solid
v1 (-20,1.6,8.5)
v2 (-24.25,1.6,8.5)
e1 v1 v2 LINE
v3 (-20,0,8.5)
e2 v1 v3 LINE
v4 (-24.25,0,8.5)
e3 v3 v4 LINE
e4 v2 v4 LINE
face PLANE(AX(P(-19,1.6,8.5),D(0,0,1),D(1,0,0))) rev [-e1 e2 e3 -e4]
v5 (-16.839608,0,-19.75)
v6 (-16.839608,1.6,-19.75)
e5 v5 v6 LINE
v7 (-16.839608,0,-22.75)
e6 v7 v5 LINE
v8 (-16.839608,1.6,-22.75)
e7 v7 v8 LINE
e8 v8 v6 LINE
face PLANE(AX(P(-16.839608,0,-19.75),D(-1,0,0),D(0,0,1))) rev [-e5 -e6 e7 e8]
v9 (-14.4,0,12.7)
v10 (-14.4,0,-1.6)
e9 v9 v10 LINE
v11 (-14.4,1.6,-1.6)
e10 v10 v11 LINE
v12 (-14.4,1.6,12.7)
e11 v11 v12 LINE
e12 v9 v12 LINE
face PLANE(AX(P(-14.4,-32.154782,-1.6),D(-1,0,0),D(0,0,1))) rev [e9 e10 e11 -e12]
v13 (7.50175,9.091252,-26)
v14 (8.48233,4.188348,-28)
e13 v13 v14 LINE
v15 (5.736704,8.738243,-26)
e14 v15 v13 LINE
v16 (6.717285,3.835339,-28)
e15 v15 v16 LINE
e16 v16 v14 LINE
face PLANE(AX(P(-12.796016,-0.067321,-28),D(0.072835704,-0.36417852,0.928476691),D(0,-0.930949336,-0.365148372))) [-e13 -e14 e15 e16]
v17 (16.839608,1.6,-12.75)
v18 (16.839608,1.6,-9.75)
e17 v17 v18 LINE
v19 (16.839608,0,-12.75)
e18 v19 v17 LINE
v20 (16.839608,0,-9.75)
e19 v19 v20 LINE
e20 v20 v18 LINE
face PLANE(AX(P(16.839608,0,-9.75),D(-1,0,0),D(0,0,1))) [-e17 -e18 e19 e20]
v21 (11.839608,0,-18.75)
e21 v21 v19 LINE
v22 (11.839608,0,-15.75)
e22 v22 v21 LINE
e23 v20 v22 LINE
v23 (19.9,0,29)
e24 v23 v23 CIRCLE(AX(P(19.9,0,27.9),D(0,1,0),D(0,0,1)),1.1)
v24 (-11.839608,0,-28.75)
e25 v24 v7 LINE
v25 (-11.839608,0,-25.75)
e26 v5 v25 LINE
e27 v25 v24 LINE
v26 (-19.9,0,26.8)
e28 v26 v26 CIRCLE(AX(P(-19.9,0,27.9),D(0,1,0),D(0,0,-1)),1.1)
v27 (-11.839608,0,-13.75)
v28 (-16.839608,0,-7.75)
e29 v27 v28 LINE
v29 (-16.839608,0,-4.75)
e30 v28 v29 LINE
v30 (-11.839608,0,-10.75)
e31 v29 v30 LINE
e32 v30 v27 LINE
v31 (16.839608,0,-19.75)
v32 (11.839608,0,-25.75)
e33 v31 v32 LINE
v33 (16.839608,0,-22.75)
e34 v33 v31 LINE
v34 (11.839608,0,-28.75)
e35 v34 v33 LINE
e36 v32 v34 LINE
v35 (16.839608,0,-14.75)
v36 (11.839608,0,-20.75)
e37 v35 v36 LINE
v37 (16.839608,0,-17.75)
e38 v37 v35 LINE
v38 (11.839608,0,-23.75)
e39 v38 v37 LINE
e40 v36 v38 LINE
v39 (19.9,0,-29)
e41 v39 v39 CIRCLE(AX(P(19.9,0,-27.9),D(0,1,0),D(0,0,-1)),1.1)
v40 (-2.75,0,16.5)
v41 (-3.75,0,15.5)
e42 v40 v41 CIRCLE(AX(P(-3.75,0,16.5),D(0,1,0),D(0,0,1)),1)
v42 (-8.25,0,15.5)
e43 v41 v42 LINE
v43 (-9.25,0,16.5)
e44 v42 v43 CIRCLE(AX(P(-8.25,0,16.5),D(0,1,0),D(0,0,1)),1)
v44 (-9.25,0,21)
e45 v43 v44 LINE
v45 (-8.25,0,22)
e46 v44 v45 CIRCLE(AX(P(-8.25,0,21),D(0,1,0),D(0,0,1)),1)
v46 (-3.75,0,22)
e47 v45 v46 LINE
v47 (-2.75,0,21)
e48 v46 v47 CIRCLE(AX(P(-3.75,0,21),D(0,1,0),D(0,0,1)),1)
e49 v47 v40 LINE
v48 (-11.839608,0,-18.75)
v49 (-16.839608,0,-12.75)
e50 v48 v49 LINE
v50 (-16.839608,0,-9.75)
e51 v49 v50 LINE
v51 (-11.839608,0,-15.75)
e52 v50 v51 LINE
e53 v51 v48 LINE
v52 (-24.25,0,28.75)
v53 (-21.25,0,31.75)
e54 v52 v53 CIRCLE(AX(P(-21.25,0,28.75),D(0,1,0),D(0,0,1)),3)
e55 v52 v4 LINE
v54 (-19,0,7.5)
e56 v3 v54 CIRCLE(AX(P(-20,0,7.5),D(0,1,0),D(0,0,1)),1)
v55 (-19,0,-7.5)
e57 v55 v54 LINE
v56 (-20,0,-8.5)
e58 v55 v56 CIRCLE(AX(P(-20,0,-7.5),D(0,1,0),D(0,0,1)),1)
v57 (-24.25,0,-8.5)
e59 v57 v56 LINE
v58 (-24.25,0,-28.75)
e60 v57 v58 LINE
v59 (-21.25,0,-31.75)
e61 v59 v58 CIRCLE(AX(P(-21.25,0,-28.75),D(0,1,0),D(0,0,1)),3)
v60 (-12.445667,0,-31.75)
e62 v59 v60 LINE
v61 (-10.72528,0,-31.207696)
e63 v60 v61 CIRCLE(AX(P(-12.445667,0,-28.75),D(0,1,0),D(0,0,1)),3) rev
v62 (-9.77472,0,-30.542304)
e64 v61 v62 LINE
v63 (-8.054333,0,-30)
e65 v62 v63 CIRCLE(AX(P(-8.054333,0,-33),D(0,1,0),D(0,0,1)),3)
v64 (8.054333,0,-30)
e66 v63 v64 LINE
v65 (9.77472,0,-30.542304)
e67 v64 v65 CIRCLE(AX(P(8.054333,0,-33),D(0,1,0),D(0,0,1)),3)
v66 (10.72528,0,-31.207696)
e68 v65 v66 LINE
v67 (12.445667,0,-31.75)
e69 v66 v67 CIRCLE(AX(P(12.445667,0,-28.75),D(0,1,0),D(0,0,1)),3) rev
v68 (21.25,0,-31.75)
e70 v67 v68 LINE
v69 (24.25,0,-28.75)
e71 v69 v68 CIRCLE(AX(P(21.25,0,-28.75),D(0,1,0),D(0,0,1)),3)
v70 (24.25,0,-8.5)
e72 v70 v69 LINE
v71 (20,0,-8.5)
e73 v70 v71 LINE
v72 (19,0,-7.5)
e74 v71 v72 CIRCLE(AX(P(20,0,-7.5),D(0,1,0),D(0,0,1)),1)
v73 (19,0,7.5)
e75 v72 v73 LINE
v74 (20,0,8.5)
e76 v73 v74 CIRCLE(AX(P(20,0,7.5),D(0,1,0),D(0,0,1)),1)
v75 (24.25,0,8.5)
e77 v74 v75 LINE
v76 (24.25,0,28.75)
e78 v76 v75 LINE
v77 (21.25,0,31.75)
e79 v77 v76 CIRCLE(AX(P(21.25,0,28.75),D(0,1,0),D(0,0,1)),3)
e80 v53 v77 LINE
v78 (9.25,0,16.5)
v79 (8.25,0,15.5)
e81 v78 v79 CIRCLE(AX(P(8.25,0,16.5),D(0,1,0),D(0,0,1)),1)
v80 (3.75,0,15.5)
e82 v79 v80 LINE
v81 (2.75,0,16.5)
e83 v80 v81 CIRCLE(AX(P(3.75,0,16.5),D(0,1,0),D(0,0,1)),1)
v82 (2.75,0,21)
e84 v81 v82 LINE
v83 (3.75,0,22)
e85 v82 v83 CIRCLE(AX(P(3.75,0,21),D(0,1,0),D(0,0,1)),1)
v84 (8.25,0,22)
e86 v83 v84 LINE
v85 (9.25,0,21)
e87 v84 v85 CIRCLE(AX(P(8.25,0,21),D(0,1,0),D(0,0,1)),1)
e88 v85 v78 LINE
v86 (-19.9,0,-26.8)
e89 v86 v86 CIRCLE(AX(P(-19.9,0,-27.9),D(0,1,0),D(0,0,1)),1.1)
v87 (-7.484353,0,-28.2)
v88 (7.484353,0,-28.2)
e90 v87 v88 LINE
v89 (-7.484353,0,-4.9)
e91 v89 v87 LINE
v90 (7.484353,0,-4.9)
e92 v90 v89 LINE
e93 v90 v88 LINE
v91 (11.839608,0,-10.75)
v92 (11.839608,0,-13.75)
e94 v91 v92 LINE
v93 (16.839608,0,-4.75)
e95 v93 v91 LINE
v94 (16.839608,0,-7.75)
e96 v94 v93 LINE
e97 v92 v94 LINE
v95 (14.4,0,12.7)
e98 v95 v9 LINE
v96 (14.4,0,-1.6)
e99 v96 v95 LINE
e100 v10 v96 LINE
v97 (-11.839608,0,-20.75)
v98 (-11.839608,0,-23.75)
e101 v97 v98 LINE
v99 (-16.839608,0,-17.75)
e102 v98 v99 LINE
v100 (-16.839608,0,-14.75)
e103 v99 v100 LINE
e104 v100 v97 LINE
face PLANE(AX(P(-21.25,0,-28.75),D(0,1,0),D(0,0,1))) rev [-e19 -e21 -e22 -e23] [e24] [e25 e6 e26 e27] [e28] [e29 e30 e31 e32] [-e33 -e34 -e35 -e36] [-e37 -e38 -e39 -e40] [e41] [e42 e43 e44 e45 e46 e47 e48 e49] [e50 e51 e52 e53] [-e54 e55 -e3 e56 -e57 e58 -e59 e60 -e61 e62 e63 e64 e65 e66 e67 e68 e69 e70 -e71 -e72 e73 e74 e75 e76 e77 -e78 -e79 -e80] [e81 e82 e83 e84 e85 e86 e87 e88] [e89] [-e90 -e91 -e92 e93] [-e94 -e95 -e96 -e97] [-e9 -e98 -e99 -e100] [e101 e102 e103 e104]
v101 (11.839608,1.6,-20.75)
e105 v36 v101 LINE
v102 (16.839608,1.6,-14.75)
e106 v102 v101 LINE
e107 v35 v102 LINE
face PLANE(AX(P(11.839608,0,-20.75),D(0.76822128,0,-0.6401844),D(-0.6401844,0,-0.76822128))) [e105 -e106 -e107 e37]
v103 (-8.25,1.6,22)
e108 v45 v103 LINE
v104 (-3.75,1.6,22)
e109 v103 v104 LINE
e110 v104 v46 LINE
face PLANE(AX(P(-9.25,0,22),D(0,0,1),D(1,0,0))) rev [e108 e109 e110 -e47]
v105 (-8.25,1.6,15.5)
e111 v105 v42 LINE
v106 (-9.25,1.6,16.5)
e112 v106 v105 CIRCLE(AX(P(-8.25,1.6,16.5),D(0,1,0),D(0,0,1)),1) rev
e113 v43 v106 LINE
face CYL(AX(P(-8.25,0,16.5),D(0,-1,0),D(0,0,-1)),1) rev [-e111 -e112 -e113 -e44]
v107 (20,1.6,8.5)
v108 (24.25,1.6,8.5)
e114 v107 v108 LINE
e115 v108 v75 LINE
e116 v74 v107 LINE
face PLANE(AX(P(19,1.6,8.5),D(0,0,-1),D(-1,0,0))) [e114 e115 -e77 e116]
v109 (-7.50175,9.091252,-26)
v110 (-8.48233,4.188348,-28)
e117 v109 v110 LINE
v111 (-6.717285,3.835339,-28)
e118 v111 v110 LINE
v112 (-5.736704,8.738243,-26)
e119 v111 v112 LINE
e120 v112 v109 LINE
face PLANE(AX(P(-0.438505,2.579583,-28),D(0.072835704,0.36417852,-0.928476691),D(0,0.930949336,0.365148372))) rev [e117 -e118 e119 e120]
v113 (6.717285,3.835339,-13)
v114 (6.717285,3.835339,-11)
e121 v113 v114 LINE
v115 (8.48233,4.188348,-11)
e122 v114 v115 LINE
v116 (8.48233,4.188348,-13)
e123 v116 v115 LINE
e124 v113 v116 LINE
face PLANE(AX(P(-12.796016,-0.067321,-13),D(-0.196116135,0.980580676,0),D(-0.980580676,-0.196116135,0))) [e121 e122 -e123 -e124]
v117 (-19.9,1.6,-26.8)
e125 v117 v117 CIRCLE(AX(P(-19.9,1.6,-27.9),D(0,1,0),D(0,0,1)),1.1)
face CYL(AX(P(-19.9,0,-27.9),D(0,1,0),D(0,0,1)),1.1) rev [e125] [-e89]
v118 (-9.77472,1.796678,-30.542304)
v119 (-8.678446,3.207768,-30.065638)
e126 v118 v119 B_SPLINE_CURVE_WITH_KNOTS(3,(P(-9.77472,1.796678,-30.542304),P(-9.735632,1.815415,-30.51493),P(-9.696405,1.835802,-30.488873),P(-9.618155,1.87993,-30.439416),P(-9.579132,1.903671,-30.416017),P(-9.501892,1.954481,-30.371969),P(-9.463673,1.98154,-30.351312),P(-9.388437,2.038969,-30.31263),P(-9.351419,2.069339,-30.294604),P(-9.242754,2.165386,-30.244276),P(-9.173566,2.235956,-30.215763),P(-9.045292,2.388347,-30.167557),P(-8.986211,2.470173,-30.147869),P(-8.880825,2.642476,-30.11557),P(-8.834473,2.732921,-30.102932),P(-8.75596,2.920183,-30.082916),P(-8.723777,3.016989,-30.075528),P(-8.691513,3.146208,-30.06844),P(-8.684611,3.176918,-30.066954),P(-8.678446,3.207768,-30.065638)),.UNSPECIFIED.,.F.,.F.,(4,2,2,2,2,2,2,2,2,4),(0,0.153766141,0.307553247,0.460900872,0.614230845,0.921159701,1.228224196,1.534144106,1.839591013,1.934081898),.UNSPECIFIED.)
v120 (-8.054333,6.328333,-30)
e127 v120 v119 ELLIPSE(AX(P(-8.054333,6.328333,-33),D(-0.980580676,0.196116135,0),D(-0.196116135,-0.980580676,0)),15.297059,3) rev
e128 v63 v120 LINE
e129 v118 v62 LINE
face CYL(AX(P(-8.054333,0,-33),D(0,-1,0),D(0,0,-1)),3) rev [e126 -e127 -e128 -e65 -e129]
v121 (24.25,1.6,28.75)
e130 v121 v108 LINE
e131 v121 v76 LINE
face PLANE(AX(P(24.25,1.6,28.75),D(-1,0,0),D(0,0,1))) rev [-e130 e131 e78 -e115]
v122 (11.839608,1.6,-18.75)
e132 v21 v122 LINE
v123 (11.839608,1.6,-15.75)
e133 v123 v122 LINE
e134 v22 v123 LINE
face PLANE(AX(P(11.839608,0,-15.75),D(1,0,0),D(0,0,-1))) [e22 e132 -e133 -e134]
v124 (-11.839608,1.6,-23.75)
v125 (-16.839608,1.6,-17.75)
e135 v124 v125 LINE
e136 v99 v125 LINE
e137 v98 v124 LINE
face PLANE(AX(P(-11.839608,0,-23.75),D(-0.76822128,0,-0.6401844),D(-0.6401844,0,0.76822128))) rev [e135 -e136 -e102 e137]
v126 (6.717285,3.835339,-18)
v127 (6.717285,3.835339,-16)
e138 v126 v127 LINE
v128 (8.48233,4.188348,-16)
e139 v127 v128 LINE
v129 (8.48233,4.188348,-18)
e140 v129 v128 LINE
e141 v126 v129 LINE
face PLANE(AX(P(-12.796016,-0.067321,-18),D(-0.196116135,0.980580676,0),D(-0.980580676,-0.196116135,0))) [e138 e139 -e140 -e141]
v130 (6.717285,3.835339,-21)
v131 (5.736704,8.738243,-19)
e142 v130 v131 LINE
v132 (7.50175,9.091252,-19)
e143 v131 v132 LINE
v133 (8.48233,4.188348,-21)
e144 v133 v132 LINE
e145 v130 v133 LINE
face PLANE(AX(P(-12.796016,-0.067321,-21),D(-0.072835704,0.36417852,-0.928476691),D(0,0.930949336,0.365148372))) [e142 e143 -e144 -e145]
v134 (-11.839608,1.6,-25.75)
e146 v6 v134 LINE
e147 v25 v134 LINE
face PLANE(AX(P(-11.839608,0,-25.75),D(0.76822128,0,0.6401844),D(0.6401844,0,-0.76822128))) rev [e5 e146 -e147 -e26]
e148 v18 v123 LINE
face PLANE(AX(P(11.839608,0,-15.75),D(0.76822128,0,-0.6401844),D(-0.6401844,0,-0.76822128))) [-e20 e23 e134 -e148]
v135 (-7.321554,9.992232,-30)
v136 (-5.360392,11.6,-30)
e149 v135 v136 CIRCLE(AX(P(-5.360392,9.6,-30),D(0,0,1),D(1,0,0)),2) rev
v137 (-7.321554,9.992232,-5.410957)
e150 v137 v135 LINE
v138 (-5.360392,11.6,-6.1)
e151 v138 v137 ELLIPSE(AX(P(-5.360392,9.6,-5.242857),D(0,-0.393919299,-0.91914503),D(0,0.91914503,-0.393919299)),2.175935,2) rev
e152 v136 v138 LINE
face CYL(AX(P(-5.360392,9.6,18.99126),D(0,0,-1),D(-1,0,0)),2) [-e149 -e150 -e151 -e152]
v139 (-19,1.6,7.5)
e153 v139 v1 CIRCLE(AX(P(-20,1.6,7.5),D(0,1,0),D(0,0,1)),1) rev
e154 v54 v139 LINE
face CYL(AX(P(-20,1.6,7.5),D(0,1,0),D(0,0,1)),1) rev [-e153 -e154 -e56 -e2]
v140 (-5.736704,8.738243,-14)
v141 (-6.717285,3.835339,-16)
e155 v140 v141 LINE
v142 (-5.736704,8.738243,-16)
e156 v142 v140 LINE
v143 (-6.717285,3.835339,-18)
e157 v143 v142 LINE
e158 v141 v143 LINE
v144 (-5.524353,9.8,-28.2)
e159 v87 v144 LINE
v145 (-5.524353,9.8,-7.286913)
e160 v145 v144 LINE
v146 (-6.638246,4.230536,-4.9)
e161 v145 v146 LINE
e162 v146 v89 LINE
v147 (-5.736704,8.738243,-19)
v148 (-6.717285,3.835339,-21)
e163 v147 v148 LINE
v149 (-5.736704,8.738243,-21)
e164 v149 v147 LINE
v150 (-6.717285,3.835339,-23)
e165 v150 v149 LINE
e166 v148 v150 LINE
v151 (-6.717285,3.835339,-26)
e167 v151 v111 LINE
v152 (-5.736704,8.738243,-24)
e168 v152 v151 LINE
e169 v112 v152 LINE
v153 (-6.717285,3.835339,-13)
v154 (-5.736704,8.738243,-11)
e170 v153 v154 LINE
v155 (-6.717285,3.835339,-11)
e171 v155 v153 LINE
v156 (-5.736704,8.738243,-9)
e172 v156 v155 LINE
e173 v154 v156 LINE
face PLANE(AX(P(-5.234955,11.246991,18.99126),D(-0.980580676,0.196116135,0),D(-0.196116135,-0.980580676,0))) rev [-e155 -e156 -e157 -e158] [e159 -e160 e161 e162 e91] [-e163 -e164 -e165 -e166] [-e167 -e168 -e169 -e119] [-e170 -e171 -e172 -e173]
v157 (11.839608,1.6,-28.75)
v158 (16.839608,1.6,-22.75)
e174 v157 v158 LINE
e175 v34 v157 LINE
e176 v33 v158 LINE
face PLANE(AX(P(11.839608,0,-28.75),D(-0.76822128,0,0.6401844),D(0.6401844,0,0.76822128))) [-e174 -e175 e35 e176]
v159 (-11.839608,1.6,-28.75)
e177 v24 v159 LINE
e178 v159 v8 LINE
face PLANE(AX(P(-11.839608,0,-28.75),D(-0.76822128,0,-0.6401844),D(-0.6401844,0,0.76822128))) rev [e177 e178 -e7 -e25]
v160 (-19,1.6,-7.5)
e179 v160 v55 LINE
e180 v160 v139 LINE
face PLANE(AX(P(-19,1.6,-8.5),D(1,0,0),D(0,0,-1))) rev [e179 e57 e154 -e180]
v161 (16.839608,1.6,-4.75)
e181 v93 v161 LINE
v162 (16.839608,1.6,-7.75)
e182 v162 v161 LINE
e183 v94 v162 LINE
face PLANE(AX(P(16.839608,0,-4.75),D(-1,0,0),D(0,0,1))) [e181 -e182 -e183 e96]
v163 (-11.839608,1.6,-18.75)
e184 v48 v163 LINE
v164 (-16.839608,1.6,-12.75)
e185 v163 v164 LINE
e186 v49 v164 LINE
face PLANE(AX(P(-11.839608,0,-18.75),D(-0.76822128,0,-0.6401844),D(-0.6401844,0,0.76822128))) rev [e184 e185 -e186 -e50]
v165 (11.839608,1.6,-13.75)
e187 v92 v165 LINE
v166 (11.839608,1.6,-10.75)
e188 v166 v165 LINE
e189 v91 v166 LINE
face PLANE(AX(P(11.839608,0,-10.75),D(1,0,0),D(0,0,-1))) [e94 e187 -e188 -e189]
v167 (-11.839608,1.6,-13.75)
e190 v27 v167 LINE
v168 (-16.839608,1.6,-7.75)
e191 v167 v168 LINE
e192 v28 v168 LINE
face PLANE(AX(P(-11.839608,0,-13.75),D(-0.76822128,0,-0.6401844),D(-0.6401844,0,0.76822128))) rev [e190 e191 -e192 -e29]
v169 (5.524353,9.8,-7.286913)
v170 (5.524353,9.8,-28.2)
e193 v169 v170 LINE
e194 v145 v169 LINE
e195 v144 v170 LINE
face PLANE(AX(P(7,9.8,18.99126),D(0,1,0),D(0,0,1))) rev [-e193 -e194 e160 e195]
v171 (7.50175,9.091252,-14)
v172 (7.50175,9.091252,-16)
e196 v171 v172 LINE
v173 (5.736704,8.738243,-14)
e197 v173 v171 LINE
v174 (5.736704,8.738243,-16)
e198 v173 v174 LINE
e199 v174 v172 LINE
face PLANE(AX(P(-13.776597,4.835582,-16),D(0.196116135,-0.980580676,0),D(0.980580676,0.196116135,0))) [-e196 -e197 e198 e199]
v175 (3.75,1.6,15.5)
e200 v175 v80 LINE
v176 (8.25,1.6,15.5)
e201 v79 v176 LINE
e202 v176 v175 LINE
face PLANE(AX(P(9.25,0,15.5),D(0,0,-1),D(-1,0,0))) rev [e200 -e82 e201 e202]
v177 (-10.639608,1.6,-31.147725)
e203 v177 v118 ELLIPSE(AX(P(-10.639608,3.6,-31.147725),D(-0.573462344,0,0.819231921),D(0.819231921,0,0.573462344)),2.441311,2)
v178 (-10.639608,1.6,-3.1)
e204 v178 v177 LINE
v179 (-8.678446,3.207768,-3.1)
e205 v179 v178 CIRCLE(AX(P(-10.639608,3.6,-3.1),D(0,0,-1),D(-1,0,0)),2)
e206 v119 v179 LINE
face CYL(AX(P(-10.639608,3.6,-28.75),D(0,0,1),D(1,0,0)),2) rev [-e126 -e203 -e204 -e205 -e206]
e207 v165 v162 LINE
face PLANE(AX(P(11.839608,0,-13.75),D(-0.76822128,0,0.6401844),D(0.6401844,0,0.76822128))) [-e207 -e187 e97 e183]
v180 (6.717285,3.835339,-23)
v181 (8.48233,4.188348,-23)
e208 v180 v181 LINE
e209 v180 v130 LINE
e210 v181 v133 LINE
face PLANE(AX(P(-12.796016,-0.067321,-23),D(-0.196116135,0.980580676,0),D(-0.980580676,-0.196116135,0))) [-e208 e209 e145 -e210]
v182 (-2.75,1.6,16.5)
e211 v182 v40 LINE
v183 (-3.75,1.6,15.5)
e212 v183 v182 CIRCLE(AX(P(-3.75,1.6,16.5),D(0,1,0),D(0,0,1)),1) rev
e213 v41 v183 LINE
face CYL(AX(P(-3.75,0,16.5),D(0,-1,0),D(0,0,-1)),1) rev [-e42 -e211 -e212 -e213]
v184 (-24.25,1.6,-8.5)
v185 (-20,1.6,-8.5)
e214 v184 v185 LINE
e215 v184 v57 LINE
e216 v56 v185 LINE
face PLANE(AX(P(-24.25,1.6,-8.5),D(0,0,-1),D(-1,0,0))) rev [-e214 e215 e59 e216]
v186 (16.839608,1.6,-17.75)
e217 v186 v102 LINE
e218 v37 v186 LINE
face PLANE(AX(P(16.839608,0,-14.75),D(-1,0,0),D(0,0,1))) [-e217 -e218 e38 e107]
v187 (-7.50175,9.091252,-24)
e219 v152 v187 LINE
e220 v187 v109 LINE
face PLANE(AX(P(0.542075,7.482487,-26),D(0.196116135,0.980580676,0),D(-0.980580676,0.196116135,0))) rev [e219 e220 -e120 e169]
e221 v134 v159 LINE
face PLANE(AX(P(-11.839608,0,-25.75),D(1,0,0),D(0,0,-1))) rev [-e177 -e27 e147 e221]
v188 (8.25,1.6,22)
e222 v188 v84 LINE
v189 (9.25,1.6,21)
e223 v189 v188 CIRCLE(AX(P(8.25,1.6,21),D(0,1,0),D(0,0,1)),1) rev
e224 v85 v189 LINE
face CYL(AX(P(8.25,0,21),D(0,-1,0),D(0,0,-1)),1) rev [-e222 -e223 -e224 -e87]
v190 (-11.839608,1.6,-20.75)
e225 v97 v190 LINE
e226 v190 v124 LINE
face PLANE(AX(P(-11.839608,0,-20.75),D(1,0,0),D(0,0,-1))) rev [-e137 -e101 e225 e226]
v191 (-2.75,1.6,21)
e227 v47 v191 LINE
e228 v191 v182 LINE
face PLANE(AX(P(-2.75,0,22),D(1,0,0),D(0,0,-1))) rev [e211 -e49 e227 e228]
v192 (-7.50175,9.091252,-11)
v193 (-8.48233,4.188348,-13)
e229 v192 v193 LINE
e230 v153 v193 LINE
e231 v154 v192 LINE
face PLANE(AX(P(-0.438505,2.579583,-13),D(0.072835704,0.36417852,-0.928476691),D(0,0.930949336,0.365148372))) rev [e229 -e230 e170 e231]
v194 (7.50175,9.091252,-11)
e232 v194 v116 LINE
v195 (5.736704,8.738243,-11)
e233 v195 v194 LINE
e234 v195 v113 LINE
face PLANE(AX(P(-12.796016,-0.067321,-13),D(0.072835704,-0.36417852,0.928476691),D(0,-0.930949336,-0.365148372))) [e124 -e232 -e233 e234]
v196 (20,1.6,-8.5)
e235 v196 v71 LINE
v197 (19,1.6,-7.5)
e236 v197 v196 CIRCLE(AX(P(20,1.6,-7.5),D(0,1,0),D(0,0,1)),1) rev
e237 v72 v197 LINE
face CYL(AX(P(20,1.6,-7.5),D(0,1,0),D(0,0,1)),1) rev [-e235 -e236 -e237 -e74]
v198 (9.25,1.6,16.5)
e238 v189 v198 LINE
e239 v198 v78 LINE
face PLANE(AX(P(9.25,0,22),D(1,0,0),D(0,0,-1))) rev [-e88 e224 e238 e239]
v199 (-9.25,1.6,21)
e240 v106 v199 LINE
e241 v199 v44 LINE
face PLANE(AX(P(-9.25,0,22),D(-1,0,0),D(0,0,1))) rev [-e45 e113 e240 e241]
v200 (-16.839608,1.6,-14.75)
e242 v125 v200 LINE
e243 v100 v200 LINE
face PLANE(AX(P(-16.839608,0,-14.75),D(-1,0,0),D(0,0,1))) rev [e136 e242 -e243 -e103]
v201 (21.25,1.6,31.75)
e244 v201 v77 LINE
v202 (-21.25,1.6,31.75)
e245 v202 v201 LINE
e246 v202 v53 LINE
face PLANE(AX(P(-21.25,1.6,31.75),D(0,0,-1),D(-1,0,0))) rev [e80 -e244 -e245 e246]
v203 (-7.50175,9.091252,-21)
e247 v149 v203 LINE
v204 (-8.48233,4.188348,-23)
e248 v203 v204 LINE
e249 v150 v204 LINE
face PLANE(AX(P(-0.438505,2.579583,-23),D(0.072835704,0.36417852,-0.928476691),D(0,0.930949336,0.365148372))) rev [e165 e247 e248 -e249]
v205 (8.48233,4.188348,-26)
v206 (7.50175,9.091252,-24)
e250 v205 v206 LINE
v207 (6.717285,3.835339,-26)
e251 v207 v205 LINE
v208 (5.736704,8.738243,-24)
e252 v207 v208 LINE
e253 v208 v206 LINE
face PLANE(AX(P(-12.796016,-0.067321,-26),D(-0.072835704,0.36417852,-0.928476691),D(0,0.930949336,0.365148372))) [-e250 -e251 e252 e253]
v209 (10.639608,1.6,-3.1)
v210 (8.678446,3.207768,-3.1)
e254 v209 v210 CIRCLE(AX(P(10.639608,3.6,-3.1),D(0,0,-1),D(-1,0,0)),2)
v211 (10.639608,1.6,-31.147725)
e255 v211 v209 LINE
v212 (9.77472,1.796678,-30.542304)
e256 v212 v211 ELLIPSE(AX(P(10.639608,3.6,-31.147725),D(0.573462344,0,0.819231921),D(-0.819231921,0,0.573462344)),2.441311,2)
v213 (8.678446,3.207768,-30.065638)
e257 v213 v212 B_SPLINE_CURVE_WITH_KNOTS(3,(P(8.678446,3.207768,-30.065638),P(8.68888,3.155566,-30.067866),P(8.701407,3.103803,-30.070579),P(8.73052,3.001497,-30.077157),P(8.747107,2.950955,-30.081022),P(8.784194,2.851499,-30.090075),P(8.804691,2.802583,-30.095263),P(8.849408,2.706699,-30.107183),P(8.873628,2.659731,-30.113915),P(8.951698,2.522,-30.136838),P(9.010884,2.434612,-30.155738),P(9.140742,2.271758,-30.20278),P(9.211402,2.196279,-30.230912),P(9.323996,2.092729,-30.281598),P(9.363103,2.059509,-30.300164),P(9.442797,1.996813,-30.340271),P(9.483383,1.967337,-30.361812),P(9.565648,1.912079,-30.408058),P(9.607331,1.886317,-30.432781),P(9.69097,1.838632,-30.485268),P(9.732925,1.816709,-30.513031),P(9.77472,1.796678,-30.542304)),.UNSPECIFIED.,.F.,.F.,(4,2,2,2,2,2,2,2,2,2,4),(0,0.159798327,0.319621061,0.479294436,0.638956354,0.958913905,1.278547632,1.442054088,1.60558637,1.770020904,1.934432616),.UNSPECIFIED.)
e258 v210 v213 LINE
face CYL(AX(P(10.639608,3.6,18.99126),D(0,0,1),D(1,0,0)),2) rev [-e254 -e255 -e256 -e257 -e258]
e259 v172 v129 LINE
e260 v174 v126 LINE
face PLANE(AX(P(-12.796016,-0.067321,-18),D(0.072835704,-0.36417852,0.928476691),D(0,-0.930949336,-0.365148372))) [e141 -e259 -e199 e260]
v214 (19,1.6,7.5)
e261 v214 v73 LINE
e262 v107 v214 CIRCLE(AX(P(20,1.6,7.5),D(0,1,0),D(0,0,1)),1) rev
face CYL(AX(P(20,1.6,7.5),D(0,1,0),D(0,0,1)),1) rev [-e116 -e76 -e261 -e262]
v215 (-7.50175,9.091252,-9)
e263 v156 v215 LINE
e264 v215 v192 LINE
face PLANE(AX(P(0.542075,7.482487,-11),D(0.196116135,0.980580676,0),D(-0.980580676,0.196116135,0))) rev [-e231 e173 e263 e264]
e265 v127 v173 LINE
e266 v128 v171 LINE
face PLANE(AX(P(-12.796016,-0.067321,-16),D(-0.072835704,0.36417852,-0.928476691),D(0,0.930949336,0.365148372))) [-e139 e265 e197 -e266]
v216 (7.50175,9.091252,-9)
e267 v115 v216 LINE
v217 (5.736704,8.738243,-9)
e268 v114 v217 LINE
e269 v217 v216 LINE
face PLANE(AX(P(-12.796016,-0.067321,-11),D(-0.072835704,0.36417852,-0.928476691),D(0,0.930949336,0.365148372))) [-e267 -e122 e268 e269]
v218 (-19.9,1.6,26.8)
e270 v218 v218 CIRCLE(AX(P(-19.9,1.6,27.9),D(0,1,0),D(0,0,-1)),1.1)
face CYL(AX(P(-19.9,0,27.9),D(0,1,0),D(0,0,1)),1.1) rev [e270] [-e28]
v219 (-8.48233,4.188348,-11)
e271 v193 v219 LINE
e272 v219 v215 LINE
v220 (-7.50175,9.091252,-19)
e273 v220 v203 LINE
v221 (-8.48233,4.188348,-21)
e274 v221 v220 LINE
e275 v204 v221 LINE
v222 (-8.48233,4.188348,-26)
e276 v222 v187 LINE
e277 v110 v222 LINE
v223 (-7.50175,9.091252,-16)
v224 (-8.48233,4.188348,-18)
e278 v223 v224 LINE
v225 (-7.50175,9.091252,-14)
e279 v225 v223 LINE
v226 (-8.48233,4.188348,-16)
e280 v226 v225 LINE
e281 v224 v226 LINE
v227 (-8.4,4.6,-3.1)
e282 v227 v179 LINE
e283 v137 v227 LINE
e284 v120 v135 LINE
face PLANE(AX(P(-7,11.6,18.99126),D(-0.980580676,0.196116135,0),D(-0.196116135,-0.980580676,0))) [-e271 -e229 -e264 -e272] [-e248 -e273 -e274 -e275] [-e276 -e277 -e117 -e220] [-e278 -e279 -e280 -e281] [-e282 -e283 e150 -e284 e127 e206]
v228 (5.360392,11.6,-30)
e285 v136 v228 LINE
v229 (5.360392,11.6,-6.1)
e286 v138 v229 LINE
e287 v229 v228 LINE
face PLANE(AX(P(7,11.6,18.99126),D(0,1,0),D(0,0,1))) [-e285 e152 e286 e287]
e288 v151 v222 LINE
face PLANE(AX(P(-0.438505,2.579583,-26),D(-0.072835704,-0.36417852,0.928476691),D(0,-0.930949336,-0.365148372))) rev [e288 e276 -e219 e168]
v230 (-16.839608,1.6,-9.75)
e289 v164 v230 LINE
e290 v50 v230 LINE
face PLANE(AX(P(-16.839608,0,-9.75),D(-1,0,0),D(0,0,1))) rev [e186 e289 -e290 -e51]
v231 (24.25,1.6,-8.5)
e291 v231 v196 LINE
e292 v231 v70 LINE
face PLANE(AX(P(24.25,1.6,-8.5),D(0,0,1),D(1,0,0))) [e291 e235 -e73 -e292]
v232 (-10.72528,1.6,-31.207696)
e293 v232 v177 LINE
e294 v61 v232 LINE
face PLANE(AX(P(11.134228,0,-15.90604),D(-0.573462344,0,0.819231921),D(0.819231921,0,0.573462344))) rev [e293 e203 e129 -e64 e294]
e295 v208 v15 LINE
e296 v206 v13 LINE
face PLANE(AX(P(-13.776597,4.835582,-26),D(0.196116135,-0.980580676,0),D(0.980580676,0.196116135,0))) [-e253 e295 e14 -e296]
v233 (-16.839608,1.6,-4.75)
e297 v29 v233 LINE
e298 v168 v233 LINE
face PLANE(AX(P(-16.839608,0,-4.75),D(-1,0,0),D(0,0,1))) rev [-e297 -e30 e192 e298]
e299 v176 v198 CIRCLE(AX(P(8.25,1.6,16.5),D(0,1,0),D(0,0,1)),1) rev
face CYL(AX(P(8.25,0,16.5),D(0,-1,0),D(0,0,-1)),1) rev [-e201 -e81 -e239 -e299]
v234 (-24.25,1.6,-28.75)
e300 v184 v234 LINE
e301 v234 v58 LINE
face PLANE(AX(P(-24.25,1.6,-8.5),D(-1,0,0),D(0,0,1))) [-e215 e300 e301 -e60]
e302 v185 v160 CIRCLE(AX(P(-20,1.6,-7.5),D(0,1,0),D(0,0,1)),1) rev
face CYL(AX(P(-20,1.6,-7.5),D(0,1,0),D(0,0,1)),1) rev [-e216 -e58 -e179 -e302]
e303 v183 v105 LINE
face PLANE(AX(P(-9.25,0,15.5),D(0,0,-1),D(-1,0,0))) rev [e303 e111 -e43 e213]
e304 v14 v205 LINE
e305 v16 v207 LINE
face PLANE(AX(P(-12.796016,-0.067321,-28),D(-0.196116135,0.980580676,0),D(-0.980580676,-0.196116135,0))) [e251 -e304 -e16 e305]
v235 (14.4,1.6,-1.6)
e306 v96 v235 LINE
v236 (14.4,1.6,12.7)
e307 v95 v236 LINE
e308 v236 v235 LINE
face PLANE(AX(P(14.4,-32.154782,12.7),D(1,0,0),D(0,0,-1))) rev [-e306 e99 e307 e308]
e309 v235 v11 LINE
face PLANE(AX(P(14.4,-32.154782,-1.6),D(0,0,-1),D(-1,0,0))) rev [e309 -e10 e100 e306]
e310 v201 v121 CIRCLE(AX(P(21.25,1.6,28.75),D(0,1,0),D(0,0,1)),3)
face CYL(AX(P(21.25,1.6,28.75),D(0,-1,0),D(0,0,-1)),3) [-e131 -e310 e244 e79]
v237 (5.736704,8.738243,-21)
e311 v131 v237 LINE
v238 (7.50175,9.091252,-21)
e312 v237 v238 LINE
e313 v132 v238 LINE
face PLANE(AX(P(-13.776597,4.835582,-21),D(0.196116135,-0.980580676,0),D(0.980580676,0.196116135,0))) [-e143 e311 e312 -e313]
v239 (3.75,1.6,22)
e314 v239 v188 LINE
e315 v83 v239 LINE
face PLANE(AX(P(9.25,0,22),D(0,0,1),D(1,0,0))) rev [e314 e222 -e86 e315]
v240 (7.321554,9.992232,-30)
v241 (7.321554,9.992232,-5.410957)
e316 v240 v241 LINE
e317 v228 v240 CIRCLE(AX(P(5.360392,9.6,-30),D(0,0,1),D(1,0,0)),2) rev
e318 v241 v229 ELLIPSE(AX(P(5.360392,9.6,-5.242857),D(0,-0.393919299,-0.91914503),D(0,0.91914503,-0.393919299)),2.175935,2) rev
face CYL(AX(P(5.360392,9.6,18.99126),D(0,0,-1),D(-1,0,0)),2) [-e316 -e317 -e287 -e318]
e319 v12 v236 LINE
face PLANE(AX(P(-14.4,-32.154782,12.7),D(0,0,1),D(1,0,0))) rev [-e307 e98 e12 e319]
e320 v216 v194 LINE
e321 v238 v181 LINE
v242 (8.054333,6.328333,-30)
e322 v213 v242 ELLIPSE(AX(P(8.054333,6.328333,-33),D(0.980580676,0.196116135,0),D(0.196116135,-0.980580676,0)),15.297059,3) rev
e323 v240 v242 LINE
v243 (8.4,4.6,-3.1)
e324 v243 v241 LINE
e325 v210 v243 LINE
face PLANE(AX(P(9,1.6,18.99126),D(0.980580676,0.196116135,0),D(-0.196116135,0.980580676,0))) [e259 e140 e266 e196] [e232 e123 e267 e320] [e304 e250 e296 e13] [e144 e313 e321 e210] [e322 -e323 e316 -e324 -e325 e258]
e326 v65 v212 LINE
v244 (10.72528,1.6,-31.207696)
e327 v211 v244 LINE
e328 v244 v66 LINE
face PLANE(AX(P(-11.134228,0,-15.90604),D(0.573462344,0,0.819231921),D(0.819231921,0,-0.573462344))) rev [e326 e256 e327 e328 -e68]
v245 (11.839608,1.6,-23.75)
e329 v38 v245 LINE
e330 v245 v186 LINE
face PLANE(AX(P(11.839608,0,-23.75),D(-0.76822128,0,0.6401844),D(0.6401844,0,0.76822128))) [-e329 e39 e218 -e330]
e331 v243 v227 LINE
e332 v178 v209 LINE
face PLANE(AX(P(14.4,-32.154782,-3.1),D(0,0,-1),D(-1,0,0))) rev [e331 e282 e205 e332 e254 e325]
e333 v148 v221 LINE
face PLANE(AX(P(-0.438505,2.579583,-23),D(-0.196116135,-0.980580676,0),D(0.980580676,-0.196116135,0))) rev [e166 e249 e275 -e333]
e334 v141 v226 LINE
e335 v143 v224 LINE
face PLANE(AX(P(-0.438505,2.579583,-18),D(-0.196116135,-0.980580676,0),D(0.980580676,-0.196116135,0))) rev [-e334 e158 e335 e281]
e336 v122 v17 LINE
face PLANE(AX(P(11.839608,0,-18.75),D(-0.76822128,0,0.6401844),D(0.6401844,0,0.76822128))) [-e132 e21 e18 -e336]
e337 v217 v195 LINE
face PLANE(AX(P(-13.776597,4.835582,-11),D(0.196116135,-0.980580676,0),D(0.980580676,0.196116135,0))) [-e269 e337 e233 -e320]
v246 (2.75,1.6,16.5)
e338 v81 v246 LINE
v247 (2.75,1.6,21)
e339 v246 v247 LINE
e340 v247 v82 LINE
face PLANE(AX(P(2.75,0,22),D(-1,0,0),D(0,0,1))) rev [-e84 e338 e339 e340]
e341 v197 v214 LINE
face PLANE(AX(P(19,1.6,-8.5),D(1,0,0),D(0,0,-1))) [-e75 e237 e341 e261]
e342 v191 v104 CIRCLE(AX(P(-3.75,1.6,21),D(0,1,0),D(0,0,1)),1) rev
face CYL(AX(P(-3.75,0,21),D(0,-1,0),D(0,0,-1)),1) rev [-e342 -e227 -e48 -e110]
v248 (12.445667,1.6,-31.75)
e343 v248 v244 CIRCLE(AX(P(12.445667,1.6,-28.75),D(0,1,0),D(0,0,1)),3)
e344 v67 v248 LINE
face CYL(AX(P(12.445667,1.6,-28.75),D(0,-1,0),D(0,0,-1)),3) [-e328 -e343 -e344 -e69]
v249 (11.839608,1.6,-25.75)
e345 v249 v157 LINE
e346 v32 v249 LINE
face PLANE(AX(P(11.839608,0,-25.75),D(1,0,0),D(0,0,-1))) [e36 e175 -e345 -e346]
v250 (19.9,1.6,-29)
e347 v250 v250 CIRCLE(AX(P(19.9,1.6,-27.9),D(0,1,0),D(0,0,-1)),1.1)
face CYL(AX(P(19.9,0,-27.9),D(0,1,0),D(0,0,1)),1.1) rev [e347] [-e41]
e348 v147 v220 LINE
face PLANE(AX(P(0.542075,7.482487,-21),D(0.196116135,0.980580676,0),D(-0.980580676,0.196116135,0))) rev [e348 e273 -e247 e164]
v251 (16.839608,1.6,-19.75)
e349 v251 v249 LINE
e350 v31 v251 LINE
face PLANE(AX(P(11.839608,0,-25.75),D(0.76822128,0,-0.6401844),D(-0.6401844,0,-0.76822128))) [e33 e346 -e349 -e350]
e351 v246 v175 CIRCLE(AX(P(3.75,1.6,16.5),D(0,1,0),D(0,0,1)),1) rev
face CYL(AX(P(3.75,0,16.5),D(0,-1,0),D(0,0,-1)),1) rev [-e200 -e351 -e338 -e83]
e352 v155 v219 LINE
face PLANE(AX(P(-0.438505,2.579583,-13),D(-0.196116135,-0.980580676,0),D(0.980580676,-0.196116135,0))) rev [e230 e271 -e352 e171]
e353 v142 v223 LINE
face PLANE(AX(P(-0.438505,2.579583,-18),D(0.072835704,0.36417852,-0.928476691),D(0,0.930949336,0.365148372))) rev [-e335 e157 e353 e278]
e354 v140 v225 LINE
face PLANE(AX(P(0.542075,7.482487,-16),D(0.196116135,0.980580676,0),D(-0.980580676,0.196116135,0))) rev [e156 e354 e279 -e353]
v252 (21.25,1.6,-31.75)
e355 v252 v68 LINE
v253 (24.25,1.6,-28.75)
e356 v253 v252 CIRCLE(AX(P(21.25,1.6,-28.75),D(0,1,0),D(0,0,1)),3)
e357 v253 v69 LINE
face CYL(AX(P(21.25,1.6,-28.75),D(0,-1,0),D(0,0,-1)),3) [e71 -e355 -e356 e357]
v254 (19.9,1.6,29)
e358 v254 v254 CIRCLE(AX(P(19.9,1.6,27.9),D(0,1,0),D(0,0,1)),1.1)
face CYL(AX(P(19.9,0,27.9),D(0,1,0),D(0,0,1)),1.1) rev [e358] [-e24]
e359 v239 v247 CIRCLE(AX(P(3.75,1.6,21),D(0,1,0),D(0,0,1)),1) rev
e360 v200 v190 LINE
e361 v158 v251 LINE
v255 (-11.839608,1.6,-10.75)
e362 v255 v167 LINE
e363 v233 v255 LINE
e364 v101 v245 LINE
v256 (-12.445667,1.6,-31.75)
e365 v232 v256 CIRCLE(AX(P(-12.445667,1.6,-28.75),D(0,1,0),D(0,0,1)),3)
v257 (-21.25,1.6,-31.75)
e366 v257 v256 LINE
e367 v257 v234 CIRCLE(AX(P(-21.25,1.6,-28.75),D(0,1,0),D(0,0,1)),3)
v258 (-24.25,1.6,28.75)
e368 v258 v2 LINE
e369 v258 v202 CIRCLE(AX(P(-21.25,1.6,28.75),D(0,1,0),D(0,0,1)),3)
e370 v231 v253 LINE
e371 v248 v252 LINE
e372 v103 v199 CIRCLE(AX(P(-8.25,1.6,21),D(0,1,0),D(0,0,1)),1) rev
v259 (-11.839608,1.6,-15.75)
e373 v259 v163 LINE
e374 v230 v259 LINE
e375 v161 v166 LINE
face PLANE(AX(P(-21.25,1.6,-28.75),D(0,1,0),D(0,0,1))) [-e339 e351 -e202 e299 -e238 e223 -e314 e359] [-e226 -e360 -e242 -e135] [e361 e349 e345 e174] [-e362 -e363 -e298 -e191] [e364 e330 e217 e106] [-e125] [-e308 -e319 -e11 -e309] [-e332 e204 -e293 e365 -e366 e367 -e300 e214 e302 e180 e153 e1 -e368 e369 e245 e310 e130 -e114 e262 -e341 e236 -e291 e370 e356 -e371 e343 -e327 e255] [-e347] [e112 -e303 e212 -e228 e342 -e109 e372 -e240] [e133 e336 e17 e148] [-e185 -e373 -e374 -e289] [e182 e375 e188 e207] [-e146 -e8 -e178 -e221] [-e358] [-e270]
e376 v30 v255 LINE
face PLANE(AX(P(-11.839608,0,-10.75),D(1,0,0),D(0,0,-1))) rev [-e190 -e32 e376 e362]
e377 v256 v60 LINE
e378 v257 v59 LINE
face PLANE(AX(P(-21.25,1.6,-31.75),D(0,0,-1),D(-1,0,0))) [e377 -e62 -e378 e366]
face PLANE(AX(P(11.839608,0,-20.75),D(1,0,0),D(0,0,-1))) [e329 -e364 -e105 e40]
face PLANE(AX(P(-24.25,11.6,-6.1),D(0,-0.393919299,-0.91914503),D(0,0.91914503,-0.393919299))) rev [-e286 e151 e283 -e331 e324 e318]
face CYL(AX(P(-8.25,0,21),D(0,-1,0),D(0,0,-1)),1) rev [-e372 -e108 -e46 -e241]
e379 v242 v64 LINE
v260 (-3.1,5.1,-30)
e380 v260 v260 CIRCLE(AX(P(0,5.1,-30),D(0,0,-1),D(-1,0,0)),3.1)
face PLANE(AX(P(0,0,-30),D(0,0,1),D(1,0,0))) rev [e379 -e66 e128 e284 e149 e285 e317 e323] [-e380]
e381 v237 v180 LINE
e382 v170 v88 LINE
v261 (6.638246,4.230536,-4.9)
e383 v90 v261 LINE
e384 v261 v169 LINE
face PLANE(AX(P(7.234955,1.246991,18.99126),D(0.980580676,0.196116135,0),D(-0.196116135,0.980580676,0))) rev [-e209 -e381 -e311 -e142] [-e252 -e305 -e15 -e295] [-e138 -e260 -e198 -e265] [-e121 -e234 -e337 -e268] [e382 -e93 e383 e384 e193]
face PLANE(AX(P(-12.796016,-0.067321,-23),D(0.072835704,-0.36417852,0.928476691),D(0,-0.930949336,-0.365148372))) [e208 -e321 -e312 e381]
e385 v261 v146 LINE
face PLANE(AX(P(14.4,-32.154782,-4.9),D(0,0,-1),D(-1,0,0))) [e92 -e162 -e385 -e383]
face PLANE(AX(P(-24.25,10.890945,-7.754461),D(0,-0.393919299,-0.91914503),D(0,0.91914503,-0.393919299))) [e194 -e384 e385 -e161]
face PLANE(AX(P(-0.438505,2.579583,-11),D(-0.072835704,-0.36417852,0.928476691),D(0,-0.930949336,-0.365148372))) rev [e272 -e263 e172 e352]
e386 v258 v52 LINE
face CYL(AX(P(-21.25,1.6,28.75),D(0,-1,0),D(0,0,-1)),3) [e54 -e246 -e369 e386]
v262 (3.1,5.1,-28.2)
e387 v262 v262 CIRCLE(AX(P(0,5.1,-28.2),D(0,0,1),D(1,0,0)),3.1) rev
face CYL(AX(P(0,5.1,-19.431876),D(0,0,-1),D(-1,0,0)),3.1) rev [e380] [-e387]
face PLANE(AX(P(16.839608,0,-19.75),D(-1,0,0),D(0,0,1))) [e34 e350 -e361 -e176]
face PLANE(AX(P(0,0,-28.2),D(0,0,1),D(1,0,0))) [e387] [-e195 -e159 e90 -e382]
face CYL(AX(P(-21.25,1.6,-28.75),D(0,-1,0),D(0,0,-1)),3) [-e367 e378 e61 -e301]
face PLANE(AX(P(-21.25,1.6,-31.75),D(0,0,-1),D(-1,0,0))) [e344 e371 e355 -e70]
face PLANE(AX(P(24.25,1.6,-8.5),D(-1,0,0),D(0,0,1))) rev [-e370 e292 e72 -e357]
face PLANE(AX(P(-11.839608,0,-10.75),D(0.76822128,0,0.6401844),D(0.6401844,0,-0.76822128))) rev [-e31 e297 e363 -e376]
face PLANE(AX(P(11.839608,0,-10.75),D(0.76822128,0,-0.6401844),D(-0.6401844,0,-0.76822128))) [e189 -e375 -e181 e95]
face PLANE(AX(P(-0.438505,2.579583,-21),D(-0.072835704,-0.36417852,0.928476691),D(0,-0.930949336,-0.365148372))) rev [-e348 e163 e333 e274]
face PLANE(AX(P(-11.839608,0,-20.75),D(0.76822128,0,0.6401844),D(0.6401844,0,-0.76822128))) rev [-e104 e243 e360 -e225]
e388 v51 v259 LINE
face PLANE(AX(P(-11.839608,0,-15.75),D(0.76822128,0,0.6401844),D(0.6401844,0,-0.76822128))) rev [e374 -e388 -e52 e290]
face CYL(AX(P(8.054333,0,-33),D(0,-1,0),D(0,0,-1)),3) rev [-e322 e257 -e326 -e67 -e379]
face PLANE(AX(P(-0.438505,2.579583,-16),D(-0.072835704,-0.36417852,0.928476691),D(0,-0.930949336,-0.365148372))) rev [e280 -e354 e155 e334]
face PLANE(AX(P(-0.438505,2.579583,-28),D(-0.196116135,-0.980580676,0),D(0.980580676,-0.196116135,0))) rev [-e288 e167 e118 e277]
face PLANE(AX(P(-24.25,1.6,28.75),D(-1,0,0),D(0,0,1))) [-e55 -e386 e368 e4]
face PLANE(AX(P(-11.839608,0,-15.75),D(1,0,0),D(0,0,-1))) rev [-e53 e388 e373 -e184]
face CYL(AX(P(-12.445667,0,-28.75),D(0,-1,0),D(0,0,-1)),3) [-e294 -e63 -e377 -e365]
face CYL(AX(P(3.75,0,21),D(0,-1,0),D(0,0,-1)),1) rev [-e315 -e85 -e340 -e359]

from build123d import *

# Parameters (mm, degrees)
EXTRUDE_1_DEPTH          = 1.6
SKETCH_2_R               = 1.1
CUT_EXTRUDE_1_DEPTH      = 40.983559121
FILLET_1_R               = 1
SKETCH_4_W               = 6.5
SKETCH_4_H               = 6.5
CUT_EXTRUDE_2_DEPTH      = 40.983559121
FILLET_2_R               = 1
SKETCH_8_W               = 28.8
SKETCH_8_H               = 14.3
CUT_EXTRUDE_3_DEPTH      = 1.6
EXTRUDE_START            = -1.75
EXTRUDE_2_DEPTH          = 26.9
CUT_EXTRUDE_4_DEPTH      = 42.601502377
CUT_EXTRUDE_4_DEPTH_BACK = 42.601502377
CUT_EXTRUDE_6_DEPTH      = 42.18403817
SHELL_START              = -28.2
SHELL_3_DEPTH            = 23.3
SHELL_START_2            = -2.83732082
SHELL_3_2_DEPTH          = 1.8
FILLET_3_R               = 3
SKETCH_15_R              = 3.1
CUT_EXTRUDE_8_DEPTH      = 1.8
FILLET_5_R               = 2
CUT_EXTRUDE_9_DEPTH      = 42.18403817
CUT_EXTRUDE_START        = -1.8
CUT_EXTRUDE_10_DEPTH     = 1.8


with BuildPart() as part:
    # 草图1 → 凸台-拉伸1 (new body)
    with BuildSketch(Plane(origin=(0, 0, 0), x_dir=(1, 0, 0), z_dir=(0, 1, 0))):
        with BuildLine():
            Line((-24.25, 8.5), (-19, 8.5))
            Line((-19, 8.5), (-19, -8.5))
            Line((-19, -8.5), (-24.25, -8.5))
            Line((-24.25, -8.5), (-24.25, -28.75))
            ThreePointArc((-24.25, -28.75), (-23.371320344, -30.871320344), (-21.25, -31.75))
            Line((-21.25, -31.75), (21.25, -31.75))
            ThreePointArc((21.25, -31.75), (23.371320344, -30.871320344), (24.25, -28.75))
            Line((24.25, -28.75), (24.25, -8.5))
            Line((24.25, -8.5), (19, -8.5))
            Line((19, -8.5), (19, 8.5))
            Line((19, 8.5), (24.25, 8.5))
            Line((24.25, 8.5), (24.25, 28.75))
            ThreePointArc((24.25, 28.75), (23.371320344, 30.871320344), (21.25, 31.75))
            Line((21.25, 31.75), (-21.25, 31.75))
            ThreePointArc((-21.25, 31.75), (-23.371320344, 30.871320344), (-24.25, 28.75))
            Line((-24.25, 28.75), (-24.25, 8.5))
        make_face()
    extrude(amount=EXTRUDE_1_DEPTH)

    # 草图2 → 切除-拉伸1 (cut, through all)
    with BuildSketch(Plane(origin=(0, 1.6, 0), x_dir=(1, 0, 0), z_dir=(0, 1, 0))):
        with Locations(Location((-19.9, 27.9, 0), (0, 0, 270))):
            Circle(SKETCH_2_R)
        with Locations(Location((19.9, 27.9, 0), (0, 0, 90))):
            Circle(SKETCH_2_R)
        with Locations(Location((19.9, -27.9, 0), (0, 0, 270))):
            Circle(SKETCH_2_R)
        with Locations(Location((-19.9, -27.9, 0), (0, 0, 90))):
            Circle(SKETCH_2_R)
    extrude(amount=-CUT_EXTRUDE_1_DEPTH, mode=Mode.SUBTRACT)

    # 圆角1
    fillet_1_edges = [part.edges().sort_by_distance(p)[0] for p in [
        (19, 0.8, -8.5),
        (19, 0.8, 8.5),
        (-19, 0.8, 8.5),
        (-19, 0.8, -8.5),
    ]]
    fillet(fillet_1_edges, radius=FILLET_1_R)

    # 草图4 → 切除-拉伸2 (cut, through all)
    with BuildSketch(Plane(origin=(0, 1.6, 0), x_dir=(1, 0, 0), z_dir=(0, 1, 0))):
        with Locations((-6, -18.75)):
            Rectangle(SKETCH_4_W, SKETCH_4_H)
        with Locations((6, -18.75)):
            Rectangle(SKETCH_4_W, SKETCH_4_H)
    extrude(amount=-CUT_EXTRUDE_2_DEPTH, mode=Mode.SUBTRACT)

    # 圆角2
    fillet_2_edges = [part.edges().sort_by_distance(p)[0] for p in [
        (-2.75, 0.8, 15.5),
        (-2.75, 0.8, 22),
        (9.25, 0.8, 15.5),
        (9.25, 0.8, 22),
        (2.75, 0.8, 22),
        (2.75, 0.8, 15.5),
        (-9.25, 0.8, 22),
        (-9.25, 0.8, 15.5),
    ]]
    fillet(fillet_2_edges, radius=FILLET_2_R)

    # 草图8 → 切除-拉伸3 (cut)
    with BuildSketch(Plane(origin=(0, 1.6, 0), x_dir=(1, 0, 0), z_dir=(0, 1, 0))):
        with Locations((0, -5.55)):
            Rectangle(SKETCH_8_W, SKETCH_8_H)
    extrude(amount=-CUT_EXTRUDE_3_DEPTH, mode=Mode.SUBTRACT)

    # 草图10 → 凸台-拉伸2 (add)
    with BuildSketch(Plane(origin=(0, 0, -31.75), x_dir=(-1, 0, 0), z_dir=(0, 0, -1)).offset(EXTRUDE_START)):
        Polygon((-9, 1.6), (9, 1.6), (7, 11.6), (-7, 11.6), align=None)
    extrude(amount=-EXTRUDE_2_DEPTH)

    # 草图11 → 切除-拉伸4 (cut, two sides: drawn at the far end of the back side and taken through both)
    with BuildSketch(Plane(origin=(0, 0, 0), x_dir=(0, 0, -1), z_dir=(1, 0, 0)).offset(-CUT_EXTRUDE_4_DEPTH_BACK)):
        Polygon((6.1, 11.6), (3.1, 4.6), (3.1, 11.6), align=None)
    extrude(amount=CUT_EXTRUDE_4_DEPTH + CUT_EXTRUDE_4_DEPTH_BACK, mode=Mode.SUBTRACT)

    # 草图14 → 切除-拉伸6 (cut, through all)
    with BuildSketch(Plane(origin=(0, 1.6, 0), x_dir=(1, 0, 0), z_dir=(0, 1, 0))):
        Polygon((-9, 30), (9, 30), (11.5, 31.75), (-11.5, 31.75), align=None)
    extrude(amount=-CUT_EXTRUDE_6_DEPTH, mode=Mode.SUBTRACT)

    # 抽壳3: read off the stored shape, not the designer's step
    # 抽壳3 outline → 抽壳3 (cut)
    with BuildSketch(Plane.XY.offset(SHELL_START)):
        Polygon((-7.484352975, 0), (7.484352975, 0), (5.524352975, 9.8), (-5.524352975, 9.8), align=None)
    extrude(amount=SHELL_3_DEPTH, mode=Mode.SUBTRACT)

    # Shell 3 2 outline → Shell 3 2 (add)
    with BuildSketch(Plane(origin=(0, 0, 0), x_dir=(1, 0, 0), z_dir=(0, 0.3939192985791679, 0.9191450300180578)).offset(SHELL_START_2)):
        Polygon((6.638245748, 5.818680827), (5.524352975, 11.878076985), (-5.524352975, 11.878076985), (-6.638245748, 5.818680827), align=None)
    extrude(amount=SHELL_3_2_DEPTH)

    # 圆角3
    fillet_3_edges = [part.edges().sort_by_distance(p)[0] for p in [
        (-11.5, 0.8, -31.75),
        (11.5, 0.8, -31.75),
        (9, 0.8, -30),
        (-9, 0.8, -30),
    ]]
    fillet(fillet_3_edges, radius=FILLET_3_R)

    # 草图15 → 切除-拉伸8 (cut)
    with BuildSketch(Plane(origin=(0, 0, -30), x_dir=(-1, 0, 0), z_dir=(0, 0, -1))):
        with Locations((0, 5.1)):
            Circle(SKETCH_15_R)
    extrude(amount=-CUT_EXTRUDE_8_DEPTH, mode=Mode.SUBTRACT)

    # 圆角5
    fillet_5_edges = [part.edges().sort_by_distance(p)[0] for p in [
        (9, 1.6, -16.626473173),
        (-9, 1.6, -16.626473173),
        (7, 11.6, -18.05),
        (-7, 11.6, -18.05),
    ]]
    fillet(fillet_5_edges, radius=FILLET_5_R)

    # 草图16 → 切除-拉伸9 (cut, through all)
    with BuildSketch(Plane(origin=(0, 1.6, 0), x_dir=(1, 0, 0), z_dir=(0, 1, 0))):
        Polygon((-11.839607805, 25.75), (-11.839607805, 28.75), (-16.839607805, 22.75), (-16.839607805, 19.75), align=None)
        Polygon((-11.839607805, 20.75), (-11.839607805, 23.75), (-16.839607805, 17.75), (-16.839607805, 14.75), align=None)
        Polygon((-11.839607805, 15.75), (-11.839607805, 18.75), (-16.839607805, 12.75), (-16.839607805, 9.75), align=None)
        Polygon((-11.839607805, 10.75), (-11.839607805, 13.75), (-16.839607805, 7.75), (-16.839607805, 4.75), align=None)
    cut_extrude_9 = extrude(amount=-CUT_EXTRUDE_9_DEPTH, mode=Mode.SUBTRACT)

    # 镜向1: 切除-拉伸9 across plane
    add(cut_extrude_9.mirror(Plane(origin=(0, 0, 0), x_dir=(0, 0, 1), z_dir=(1, 0, 0))), mode=Mode.SUBTRACT)

    # 草图18 → 切除-拉伸10 (cut)
    with BuildSketch(Plane(origin=(-8.961538462, 1.792307692, 0), x_dir=(0, 0, 1), z_dir=(-0.9805806756909202, 0.19611613513818404, 0)).offset(CUT_EXTRUDE_START)):
        Polygon((-28, 2.44349167), (-26, 2.44349167), (-24, 7.44349167), (-26, 7.44349167), align=None)
        Polygon((-23, 2.44349167), (-21, 2.44349167), (-19, 7.44349167), (-21, 7.44349167), align=None)
        Polygon((-18, 2.44349167), (-16, 2.44349167), (-14, 7.44349167), (-16, 7.44349167), align=None)
        Polygon((-13, 2.44349167), (-11, 2.44349167), (-9, 7.44349167), (-11, 7.44349167), align=None)
    cut_extrude_10 = extrude(amount=CUT_EXTRUDE_10_DEPTH, mode=Mode.SUBTRACT)

    # 镜向2: 切除-拉伸10 across plane
    add(cut_extrude_10.mirror(Plane(origin=(0, 0, 0), x_dir=(0, 0, 1), z_dir=(1, 0, 0))), mode=Mode.SUBTRACT)


solid = part.part
